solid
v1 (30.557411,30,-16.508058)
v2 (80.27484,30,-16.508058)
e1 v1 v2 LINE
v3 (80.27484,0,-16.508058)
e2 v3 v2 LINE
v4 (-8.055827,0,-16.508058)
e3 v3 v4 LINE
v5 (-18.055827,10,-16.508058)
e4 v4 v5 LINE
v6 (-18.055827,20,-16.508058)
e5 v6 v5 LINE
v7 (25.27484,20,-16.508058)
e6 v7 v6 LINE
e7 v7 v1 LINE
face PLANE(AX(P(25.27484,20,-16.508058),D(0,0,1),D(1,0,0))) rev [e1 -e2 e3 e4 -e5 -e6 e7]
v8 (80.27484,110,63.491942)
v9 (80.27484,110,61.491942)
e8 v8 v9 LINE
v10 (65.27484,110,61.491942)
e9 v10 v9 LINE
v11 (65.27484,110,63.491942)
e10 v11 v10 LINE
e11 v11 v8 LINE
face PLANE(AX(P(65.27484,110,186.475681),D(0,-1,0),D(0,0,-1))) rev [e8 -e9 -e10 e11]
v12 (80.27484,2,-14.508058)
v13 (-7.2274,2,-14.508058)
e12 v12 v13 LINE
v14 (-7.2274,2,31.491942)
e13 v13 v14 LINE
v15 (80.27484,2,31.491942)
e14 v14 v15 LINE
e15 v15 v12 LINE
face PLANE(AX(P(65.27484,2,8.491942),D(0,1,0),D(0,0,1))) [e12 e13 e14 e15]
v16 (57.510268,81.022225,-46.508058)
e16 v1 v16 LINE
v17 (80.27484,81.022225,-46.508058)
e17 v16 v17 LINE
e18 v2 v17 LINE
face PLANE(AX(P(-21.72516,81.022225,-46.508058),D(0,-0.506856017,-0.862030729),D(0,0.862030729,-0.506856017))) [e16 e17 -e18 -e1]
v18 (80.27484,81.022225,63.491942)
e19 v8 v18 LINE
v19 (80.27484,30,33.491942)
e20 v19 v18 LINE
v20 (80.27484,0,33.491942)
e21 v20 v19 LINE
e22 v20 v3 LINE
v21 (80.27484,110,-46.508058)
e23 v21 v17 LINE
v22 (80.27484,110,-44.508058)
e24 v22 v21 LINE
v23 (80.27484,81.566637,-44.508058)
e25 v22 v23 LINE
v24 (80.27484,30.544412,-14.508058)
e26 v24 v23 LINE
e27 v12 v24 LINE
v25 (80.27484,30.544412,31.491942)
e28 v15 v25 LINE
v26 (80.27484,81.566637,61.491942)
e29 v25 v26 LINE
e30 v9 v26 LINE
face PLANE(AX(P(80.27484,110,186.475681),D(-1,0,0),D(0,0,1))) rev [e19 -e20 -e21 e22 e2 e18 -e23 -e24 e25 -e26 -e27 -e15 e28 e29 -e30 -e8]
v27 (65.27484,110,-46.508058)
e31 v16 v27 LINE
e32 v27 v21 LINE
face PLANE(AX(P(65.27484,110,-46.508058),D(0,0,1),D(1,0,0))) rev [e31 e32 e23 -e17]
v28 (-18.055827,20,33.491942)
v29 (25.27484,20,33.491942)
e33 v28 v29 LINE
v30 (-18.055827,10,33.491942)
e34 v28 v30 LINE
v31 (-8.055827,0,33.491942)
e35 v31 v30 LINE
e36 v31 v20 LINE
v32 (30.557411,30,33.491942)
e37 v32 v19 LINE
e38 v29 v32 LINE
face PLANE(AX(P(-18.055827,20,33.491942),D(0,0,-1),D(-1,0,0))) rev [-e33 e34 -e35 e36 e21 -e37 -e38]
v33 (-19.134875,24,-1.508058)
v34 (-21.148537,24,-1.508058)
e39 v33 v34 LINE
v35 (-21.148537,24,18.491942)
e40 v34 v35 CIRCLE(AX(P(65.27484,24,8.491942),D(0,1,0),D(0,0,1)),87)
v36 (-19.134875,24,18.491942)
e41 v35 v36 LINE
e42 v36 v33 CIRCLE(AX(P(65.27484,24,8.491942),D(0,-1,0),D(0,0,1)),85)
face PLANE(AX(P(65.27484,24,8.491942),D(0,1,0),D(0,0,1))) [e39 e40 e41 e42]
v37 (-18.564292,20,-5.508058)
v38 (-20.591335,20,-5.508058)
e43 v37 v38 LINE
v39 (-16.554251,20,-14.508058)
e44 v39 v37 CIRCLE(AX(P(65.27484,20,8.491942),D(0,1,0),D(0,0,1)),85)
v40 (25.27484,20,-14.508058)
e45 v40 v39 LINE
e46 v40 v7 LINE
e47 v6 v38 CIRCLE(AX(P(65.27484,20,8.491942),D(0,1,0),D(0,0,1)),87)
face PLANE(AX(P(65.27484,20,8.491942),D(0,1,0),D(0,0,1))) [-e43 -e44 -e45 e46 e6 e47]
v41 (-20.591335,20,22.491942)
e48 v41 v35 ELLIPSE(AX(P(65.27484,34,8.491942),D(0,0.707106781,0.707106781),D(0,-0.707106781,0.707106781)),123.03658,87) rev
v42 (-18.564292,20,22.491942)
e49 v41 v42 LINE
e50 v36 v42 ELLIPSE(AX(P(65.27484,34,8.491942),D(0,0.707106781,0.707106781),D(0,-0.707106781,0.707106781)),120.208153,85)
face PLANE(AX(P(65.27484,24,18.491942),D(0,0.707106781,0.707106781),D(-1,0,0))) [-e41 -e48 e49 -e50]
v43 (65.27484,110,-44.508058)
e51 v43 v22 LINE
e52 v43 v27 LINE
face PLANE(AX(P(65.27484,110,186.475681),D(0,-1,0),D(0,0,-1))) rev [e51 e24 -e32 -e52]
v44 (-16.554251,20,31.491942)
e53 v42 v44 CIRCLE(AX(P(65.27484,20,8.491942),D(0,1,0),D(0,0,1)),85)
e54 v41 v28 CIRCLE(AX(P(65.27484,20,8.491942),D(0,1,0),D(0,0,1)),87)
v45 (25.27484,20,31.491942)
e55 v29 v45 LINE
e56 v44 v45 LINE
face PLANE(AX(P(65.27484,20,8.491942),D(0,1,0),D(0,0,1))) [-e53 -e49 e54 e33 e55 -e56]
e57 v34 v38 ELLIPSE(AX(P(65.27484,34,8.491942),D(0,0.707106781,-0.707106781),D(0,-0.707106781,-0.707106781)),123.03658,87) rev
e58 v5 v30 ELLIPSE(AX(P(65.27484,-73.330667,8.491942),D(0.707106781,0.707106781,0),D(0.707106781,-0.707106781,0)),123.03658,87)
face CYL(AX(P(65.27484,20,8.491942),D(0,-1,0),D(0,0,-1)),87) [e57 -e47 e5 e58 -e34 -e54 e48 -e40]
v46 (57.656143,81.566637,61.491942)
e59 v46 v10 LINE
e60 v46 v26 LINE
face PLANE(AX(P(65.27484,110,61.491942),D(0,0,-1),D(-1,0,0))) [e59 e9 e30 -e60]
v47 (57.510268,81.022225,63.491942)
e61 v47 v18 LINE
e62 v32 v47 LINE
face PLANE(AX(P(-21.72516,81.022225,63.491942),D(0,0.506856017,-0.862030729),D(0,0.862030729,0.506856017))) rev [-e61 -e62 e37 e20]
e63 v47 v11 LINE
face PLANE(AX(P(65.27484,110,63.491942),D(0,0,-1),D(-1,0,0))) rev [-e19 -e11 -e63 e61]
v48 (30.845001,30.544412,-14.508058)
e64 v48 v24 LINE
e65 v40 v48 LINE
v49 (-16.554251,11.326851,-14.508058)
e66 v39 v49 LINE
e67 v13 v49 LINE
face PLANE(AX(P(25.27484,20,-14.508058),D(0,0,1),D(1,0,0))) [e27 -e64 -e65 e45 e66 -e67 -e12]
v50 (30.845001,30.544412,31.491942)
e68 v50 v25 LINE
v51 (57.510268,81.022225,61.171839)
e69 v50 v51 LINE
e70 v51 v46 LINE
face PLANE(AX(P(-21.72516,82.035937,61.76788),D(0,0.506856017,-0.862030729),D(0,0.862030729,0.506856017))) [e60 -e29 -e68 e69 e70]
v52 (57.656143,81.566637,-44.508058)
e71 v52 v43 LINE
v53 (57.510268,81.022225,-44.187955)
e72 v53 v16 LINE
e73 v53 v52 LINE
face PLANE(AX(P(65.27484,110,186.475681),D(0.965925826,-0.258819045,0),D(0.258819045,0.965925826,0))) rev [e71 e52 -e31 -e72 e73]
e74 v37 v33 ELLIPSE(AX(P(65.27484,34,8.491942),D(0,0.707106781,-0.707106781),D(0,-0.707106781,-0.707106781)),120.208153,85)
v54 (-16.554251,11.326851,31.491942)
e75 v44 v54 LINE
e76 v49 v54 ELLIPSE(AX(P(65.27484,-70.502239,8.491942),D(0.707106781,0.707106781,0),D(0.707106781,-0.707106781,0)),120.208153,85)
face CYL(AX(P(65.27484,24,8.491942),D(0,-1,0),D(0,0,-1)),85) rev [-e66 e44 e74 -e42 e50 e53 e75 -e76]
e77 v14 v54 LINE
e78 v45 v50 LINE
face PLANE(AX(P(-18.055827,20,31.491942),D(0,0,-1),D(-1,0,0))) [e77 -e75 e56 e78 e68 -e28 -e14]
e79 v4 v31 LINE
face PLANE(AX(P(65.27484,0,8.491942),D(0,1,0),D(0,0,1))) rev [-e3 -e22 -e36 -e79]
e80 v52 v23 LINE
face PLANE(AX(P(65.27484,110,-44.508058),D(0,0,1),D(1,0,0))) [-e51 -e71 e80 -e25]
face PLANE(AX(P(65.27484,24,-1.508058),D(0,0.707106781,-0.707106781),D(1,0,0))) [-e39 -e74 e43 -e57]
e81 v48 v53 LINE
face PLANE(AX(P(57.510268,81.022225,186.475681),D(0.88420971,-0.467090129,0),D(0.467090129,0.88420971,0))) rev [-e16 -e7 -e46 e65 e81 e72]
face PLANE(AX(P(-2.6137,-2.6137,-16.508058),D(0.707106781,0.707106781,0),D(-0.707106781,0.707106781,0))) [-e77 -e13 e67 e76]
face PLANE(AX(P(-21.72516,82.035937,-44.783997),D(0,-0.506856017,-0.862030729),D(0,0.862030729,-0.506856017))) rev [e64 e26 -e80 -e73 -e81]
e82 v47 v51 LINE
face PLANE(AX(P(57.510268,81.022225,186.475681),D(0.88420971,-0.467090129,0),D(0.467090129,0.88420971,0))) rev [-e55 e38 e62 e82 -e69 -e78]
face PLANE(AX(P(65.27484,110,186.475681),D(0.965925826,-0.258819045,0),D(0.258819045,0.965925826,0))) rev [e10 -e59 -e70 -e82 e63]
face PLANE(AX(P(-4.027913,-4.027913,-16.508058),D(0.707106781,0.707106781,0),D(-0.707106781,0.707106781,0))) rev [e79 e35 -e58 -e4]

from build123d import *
from build123d.topology import SkipClean

# Parameters (mm, degrees)
BOSS_EXTRUDE1_DEPTH      = 20
CUT_EXTRUDE1_DEPTH       = 60.487961127
BOSS_EXTRUDE2_DEPTH      = 4
CHAMFER1_SIZE            = 4
BOSS_EXTRUDE3_DEPTH      = 30
BOSS_EXTRUDE3_DEPTH_BACK = 80
CUT_EXTRUDE2_DEPTH       = 163.896367878
SHELL1_START             = -17.663350197
SHELL1_DEPTH             = 97.938189841
SHELL1_START_2           = -19.725064534
SHELL1_2_OUTLINE_W       = 18
SHELL1_2_OUTLINE_H       = 46
SHELL1_2_DEPTH           = 3.170813997
SHELL1_START_3           = 4.138253986
SHELL1_3_DEPTH           = 15.861746014
SHELL1_START_4           = -11.021607192
SHELL1_4_DEPTH           = 5.325277307
SHELL1_START_5           = -5.696329885
SHELL1_5_DEPTH           = 2


with BuildPart() as part:
    # Sketch1 → Boss-Extrude1 (new body)
    with BuildSketch(Plane(origin=(0, 0, 0), x_dir=(1, 0, 0), z_dir=(0, 1, 0))):
        with BuildLine():
            Line((25.274839644, -23.491941756), (25.274839644, 16.508058244))
            Line((25.274839644, 16.508058244), (-18.05582698, 16.508058244))
            ThreePointArc((-18.05582698, 16.508058244), (-21.573303396, -3.353843819), (-20.422301498, -23.491941756))
            ThreePointArc((-20.422301498, -23.491941756), (-19.386839701, -28.526912443), (-18.05582698, -33.491941756))
            Line((-18.05582698, -33.491941756), (25.274839644, -33.491941756))
            Line((25.274839644, -33.491941756), (25.274839644, -23.491941756))
        make_face()
    extrude(amount=BOSS_EXTRUDE1_DEPTH)

    # Sketch2 → Cut-Extrude1 (cut, through all)
    with BuildSketch(Plane.XY.offset(33.491941756)):
        Polygon((-18.05582698, 10), (-18.05582698, 0), (-8.05582698, 0), align=None)
        Polygon((-8.05582698, 0), (-18.05582698, 0), (-18.05582698, 10), (-26.022793605, 17.966966625), (-26.022793605, -4.913514026), (-8.05582698, -4.913514026), align=None)
    extrude(amount=-CUT_EXTRUDE1_DEPTH, mode=Mode.SUBTRACT)

    # Sketch3 → Boss-Extrude2 (add)
    with BuildSketch(Plane(origin=(0, 20, 0), x_dir=(1, 0, 0), z_dir=(0, 1, 0))):
        with BuildLine():
            Line((-20.591335302, 5.508058244), (-18.56429203, 5.508058244))
            ThreePointArc((-18.56429203, 5.508058244), (-19.725160356, -8.491941756), (-18.56429203, -22.491941756))
            Line((-18.56429203, -22.491941756), (-20.591335302, -22.491941756))
            ThreePointArc((-20.591335302, -22.491941756), (-21.725160356, -8.491941756), (-20.591335302, 5.508058244))
        make_face()
    extrude(amount=BOSS_EXTRUDE2_DEPTH)

    # Chamfer1
    chamfer1_edges = [part.edges().sort_by_distance(p)[0] for p in [
        (-19.577813666, 24, -5.508058244),
        (-19.577813666, 24, 22.491941756),
    ]]
    chamfer(chamfer1_edges, length=CHAMFER1_SIZE - 0.0001)  # a hair under: the kernel refuses the full size

    # Sketch4 → Boss-Extrude3 (add, two sides: drawn at the far end of the back side and taken through both)
    with BuildSketch(Plane.XY.offset(33.491941756).offset(-BOSS_EXTRUDE3_DEPTH_BACK)):
        Polygon((65.274839644, 110), (57.510268291, 81.022225211), (25.274839644, 20), (25.274839644, 0), (80.274839644, 0), (80.274839644, 110), align=None)
    extrude(amount=BOSS_EXTRUDE3_DEPTH + BOSS_EXTRUDE3_DEPTH_BACK)

    # Sketch5 → Cut-Extrude2 (cut, through all)
    with BuildSketch(Plane(origin=(80.274839644, 0, 0), x_dir=(0, 0, -1), z_dir=(1, 0, 0))):
        Polygon((-63.491941756, 0), (-33.491941756, 0), (-33.491941756, 30), (-63.491941756, 81.022225211), align=None)
    cut_extrude2 = extrude(amount=-CUT_EXTRUDE2_DEPTH, mode=Mode.SUBTRACT)

    # Mirror1: Cut-Extrude2 across plane
    add(cut_extrude2.mirror(Plane.XY.offset(8.491941756)), mode=Mode.SUBTRACT)

    # Shell1: read off the stored shape, not the designer's step
    # Shell1 outline → Shell1 (cut)
    with BuildSketch(Plane.YZ.offset(SHELL1_START)):
        Polygon((2, 31.491941756), (2, -14.508058244), (30.544412087, -14.508058244), (81.566637298, -44.508058244), (110, -44.508058244), (110, 61.491941756), (81.566637298, 61.491941756), (30.544412087, 31.491941756), align=None)
    extrude(amount=SHELL1_DEPTH, mode=Mode.SUBTRACT)

    # Shell1 2 outline → Shell1 2 (cut)
    with BuildSketch(Plane.YZ.offset(SHELL1_START_2)):
        with Locations((11, 8.491941756)):
            Rectangle(SHELL1_2_OUTLINE_W, SHELL1_2_OUTLINE_H)
    extrude(amount=SHELL1_2_DEPTH, mode=Mode.SUBTRACT)

    # Shell1 3 outline → Shell1 3 (add)
    with SkipClean():  # the faces are left unmerged after this step: merging them gives an invalid solid
        with BuildSketch(Plane(origin=(0, 0, 0), x_dir=(1, 0, 0), z_dir=(0, 1, 0)).offset(SHELL1_START_3)):
            with BuildLine():
                ThreePointArc((-19.725064534, -27.039617882), (-19.20680208, -29.272995907), (-18.62986821, -31.491941756))
                Line((-18.62986821, -31.491941756), (-16.554250537, -31.491941756))
                ThreePointArc((-16.554250537, -31.491941756), (-18.92870145, -20.100717198), (-19.725160356, -8.491941756))
                Line((-19.725160356, -8.491941756), (-19.725064534, -27.039617882))
            make_face()
            with BuildLine():
                ThreePointArc((-18.62986821, 14.508058244), (-19.20680208, 12.289112394), (-19.725064535, 10.055734369))
                Line((-19.725064535, 10.055734369), (-19.725160356, -8.491941756))
                ThreePointArc((-19.725160356, -8.491941756), (-18.92870145, 3.116833686), (-16.554250537, 14.508058244))
                Line((-16.554250537, 14.508058244), (-18.62986821, 14.508058244))
            make_face()
        extrude(amount=SHELL1_3_DEPTH)

    # Shell1 4 outline → Shell1 4 (cut)
    with SkipClean():  # the faces are left unmerged after this step: merging them gives an invalid solid
        with BuildSketch(Plane(origin=(0, 0, 0), x_dir=(0.7071067811865509, -0.707106781186544, 0), z_dir=(0.707106781186544, 0.707106781186551, 0)).offset(SHELL1_START_4)):
            with BuildLine():
                Line((-5.696329885, 16.508058244), (-19.838465509, 16.508058244))
                add(Edge.make_bspline(
                    [(-19.838465509, 16.508058244), (-30.445406654, -8.491941756), (-19.838465509, -33.491941756)],
                    knots=[2.850127051, 2.850127051, 2.850127051, 3.433058256, 3.433058256, 3.433058256], degree=2, weights=[1, 0.957823754, 1]))
                Line((-19.838465509, -33.491941756), (-5.696329885, -33.491941756))
                Line((-5.696329885, -33.491941756), (-5.696329885, 16.508058244))
            make_face()
        extrude(amount=SHELL1_4_DEPTH, mode=Mode.SUBTRACT)

    # Shell1 5 outline → Shell1 5 (add)
    with SkipClean():  # the faces are left unmerged after this step: merging them gives an invalid solid
        with BuildSketch(Plane(origin=(0, 0, 0), x_dir=(0.7071067811865509, -0.707106781186544, 0), z_dir=(0.707106781186544, 0.707106781186551, 0)).offset(SHELL1_START_5)):
            with BuildLine():
                Line((-6.52475701, -31.491941756), (-6.52475701, 14.508058244))
                Line((-6.52475701, 14.508058244), (-19.71491574, 14.508058244))
                add(Edge.make_bspline(
                    [(-19.71491574, 14.508058244), (-28.857373182, -8.491941756), (-19.71491574, -31.491941756)],
                    knots=[2.867588645, 2.867588645, 2.867588645, 3.415596662, 3.415596662, 3.415596662], degree=2, weights=[1, 0.962695179, 1]))
                Line((-19.71491574, -31.491941756), (-6.52475701, -31.491941756))
            make_face()
        extrude(amount=SHELL1_5_DEPTH)


solid = part.part
